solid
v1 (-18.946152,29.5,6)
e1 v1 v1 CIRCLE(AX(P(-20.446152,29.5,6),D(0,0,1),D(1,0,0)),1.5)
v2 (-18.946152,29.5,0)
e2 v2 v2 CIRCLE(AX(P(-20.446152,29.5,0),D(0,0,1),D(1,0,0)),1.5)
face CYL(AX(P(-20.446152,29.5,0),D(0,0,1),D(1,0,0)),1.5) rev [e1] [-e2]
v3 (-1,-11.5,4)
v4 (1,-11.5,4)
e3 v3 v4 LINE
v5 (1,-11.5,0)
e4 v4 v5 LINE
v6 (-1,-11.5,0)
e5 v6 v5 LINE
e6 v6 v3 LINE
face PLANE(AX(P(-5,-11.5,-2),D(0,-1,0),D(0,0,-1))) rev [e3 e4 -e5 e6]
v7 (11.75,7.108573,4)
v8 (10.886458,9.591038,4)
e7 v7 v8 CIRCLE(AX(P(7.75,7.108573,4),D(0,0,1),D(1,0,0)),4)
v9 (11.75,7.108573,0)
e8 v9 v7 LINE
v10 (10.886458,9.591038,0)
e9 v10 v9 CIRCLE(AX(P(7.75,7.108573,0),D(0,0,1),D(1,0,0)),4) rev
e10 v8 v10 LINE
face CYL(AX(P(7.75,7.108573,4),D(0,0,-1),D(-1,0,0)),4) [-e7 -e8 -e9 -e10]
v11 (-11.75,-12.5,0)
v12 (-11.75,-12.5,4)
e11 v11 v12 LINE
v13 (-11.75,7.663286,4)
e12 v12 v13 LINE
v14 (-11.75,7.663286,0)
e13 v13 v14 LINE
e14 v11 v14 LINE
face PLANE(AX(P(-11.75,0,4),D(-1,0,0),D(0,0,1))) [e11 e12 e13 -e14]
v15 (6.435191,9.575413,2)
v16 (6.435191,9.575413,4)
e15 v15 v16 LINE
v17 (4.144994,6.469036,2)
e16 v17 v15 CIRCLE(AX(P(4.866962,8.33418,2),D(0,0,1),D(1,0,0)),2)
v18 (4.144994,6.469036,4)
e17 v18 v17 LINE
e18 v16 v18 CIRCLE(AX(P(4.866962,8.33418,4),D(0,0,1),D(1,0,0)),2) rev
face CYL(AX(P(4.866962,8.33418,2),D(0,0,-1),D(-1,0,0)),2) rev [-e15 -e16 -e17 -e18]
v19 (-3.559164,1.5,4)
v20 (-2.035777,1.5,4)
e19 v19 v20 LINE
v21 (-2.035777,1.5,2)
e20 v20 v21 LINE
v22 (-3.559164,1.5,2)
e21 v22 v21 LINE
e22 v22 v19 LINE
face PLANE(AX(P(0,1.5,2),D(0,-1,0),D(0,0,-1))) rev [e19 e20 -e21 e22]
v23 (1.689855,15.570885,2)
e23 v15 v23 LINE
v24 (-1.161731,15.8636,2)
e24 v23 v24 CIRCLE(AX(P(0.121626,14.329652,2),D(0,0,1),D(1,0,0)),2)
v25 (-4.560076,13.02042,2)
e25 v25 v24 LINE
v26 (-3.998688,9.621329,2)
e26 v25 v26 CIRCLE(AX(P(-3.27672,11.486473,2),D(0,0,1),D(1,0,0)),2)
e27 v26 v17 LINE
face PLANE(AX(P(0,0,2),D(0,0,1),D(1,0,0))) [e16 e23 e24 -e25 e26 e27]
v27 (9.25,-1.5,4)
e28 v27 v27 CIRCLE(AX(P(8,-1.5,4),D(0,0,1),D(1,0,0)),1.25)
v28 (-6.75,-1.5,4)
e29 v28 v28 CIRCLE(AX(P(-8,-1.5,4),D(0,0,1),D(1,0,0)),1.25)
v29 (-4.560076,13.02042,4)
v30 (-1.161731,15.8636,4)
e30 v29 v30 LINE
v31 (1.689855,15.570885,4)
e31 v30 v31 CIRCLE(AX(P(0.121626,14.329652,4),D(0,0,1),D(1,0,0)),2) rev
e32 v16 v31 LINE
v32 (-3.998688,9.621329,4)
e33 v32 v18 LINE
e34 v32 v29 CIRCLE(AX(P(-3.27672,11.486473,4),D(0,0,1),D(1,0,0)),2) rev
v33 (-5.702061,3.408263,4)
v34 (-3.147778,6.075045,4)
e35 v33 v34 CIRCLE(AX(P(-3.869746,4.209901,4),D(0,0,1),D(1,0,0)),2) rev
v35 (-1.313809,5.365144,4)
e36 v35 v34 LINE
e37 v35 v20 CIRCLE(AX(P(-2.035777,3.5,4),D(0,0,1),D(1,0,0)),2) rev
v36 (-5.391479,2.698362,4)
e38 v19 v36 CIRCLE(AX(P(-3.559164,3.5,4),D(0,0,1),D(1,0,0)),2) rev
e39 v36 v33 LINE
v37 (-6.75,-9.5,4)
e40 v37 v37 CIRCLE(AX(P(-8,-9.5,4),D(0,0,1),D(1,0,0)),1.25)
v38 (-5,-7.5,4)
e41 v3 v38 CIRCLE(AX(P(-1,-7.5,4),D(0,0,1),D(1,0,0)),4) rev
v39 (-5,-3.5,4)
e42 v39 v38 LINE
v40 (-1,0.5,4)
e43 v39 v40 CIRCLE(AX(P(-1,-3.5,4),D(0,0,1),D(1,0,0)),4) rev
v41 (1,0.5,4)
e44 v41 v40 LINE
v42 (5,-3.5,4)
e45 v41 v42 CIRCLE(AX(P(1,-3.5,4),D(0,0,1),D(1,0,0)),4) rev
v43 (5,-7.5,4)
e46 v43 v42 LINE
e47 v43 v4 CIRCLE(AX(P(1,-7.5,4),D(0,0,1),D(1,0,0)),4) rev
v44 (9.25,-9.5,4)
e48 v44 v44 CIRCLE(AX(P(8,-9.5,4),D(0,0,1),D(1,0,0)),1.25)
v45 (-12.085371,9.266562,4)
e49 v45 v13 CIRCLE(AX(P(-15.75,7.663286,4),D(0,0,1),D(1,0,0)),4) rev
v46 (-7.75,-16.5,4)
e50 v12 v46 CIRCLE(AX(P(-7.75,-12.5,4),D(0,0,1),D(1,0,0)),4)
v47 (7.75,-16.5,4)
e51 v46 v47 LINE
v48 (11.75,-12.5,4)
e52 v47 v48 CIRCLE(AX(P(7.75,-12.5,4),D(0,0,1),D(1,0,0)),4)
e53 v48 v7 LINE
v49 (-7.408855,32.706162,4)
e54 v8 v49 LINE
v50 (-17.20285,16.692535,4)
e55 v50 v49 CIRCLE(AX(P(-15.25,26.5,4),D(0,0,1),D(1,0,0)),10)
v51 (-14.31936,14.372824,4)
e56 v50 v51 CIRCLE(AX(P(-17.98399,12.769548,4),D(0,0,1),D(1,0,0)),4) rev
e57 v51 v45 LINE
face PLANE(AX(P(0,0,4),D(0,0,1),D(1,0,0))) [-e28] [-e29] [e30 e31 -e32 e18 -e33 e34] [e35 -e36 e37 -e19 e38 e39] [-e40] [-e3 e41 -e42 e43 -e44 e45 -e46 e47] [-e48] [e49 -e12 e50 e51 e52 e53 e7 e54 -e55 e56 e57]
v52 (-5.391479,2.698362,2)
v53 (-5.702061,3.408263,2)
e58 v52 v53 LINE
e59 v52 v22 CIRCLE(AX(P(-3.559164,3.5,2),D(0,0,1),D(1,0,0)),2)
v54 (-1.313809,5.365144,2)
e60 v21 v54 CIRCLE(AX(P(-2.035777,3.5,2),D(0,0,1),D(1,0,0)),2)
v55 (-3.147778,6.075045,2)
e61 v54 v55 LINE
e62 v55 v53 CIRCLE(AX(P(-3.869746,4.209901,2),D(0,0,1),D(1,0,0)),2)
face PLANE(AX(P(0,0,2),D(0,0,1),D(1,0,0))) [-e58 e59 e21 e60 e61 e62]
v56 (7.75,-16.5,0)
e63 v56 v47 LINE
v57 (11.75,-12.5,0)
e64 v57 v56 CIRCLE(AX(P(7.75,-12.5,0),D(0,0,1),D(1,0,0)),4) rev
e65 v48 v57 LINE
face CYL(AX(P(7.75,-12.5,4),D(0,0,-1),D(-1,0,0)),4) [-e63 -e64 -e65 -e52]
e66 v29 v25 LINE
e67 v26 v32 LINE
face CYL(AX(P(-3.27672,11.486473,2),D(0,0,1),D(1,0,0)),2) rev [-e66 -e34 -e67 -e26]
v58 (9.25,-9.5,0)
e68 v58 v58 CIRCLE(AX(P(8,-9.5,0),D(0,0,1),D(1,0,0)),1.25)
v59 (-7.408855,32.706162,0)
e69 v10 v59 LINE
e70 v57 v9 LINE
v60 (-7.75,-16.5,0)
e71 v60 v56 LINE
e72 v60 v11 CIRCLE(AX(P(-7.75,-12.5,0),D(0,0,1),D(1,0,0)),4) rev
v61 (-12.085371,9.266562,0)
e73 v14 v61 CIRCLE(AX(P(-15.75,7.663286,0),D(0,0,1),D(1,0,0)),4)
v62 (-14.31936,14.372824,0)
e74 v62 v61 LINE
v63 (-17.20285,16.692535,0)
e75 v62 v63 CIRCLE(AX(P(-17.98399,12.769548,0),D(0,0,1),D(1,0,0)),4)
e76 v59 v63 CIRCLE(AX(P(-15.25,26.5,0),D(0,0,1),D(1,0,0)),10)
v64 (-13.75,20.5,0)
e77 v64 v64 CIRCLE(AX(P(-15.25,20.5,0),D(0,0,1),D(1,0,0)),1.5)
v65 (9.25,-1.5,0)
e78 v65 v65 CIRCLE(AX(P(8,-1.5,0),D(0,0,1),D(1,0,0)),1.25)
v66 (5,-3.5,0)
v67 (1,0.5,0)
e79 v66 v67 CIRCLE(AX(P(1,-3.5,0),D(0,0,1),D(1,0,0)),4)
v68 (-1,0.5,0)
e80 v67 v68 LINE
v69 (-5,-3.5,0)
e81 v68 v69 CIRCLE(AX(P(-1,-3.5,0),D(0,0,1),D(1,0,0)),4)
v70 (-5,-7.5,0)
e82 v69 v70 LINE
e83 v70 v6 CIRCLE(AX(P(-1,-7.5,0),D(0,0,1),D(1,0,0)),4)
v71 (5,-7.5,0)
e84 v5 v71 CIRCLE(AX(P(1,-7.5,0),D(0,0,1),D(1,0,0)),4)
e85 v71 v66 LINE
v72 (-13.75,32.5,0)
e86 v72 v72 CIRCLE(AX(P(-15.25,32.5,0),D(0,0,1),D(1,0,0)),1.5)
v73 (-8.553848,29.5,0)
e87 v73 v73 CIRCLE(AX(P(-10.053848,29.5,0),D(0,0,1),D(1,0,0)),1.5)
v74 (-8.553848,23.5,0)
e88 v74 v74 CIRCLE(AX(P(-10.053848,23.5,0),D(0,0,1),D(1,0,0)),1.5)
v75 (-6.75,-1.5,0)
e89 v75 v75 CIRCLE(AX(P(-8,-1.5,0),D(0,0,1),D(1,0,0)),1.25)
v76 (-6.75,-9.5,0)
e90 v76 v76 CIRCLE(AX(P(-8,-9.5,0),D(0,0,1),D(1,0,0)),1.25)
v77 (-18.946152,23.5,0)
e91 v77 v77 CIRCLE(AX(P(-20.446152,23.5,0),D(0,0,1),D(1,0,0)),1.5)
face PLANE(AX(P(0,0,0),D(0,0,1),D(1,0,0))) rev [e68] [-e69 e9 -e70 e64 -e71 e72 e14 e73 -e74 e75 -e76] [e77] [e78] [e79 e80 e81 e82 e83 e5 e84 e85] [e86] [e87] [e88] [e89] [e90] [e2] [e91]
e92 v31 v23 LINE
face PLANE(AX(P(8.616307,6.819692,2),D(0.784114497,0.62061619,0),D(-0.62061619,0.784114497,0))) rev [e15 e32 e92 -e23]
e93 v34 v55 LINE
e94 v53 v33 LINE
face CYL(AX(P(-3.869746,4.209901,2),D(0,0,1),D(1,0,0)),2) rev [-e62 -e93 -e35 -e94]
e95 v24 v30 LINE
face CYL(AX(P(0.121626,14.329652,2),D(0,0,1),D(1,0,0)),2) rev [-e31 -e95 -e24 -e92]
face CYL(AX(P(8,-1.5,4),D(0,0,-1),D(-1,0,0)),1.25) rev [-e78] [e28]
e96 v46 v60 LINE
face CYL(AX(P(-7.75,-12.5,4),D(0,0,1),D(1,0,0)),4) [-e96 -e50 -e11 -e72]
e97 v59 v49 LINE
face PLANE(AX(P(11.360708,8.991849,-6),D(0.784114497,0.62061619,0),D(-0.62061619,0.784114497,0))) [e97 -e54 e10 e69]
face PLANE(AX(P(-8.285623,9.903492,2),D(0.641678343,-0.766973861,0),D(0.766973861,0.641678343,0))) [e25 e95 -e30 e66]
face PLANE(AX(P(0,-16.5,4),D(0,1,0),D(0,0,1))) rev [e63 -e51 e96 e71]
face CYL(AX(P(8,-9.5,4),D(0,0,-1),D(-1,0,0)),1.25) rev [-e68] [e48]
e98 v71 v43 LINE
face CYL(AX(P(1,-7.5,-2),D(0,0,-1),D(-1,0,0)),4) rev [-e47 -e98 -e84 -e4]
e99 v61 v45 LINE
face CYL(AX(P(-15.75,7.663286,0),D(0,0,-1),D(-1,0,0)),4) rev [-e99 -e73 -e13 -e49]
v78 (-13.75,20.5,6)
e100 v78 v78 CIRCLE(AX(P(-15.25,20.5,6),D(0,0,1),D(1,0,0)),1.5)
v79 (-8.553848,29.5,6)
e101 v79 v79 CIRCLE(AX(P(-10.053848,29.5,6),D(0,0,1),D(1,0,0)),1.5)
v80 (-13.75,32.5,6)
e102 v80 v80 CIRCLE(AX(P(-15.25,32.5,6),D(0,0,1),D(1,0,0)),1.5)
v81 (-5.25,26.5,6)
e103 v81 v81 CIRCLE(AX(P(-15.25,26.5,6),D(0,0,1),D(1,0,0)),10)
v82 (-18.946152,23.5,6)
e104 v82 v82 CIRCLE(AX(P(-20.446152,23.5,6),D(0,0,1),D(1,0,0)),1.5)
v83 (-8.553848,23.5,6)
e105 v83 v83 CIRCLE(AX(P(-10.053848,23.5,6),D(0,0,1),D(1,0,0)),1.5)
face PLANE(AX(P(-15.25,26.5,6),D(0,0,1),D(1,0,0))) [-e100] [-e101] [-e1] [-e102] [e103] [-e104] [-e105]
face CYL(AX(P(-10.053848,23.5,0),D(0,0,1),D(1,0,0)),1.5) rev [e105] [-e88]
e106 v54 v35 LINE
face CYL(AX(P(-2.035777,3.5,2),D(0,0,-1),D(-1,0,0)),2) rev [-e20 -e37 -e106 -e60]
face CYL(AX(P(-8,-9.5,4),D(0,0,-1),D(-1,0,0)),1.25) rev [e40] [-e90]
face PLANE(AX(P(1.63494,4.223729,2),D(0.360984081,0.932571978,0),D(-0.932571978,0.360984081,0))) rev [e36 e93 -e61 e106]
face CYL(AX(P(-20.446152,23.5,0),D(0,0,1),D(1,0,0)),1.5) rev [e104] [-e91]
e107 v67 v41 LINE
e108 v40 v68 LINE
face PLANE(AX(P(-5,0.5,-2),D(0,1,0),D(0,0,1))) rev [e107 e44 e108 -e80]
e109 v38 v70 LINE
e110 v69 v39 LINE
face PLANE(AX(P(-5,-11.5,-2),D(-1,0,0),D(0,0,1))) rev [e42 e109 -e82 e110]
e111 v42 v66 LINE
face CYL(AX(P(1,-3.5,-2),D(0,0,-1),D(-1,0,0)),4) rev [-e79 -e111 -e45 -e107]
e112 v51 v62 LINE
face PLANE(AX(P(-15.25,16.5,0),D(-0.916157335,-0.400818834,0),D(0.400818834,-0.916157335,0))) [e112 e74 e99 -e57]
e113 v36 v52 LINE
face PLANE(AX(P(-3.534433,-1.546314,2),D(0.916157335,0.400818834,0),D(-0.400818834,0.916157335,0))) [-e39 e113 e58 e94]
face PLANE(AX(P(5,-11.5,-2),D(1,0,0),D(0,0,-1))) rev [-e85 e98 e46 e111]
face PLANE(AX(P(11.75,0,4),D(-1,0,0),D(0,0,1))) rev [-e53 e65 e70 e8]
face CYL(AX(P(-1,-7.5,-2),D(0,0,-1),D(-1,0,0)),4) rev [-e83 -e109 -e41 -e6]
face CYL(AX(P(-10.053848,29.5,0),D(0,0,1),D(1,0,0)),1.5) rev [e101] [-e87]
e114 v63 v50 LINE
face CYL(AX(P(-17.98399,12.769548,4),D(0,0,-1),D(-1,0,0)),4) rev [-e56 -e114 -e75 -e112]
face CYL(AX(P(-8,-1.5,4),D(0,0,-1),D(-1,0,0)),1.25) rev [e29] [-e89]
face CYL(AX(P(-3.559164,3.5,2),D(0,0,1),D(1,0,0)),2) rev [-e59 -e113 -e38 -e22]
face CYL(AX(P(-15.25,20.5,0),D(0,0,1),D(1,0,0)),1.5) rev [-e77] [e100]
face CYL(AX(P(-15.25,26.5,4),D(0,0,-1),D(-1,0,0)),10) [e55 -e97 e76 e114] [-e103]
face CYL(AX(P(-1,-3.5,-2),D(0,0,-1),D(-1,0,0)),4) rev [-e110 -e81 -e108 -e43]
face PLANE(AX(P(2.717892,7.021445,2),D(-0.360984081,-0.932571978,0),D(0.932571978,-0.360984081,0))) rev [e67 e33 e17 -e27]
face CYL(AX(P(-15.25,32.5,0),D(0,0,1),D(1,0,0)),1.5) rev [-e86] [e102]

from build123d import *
from build123d.topology import SkipClean

# Parameters (mm, degrees)
SKETCH_1_R          = 10
SKETCH_1_W          = 23.5
SKETCH_1_H          = 33
SKETCH_1_R_2        = 1.25
EXTRUDE_1_DEPTH     = 4
SKETCH_2_R          = 10
EXTRUDE_2_DEPTH     = 2
SKETCH_3_R          = 1.5
CUT_EXTRUDE_1_DEPTH = 6
SKETCH_4_W          = 10
SKETCH_4_H          = 12
CUT_EXTRUDE_2_DEPTH = 6
CUT_EXTRUDE_START   = -10
CUT_EXTRUDE_4_DEPTH = 10
EXTRUDE_4_DEPTH     = 4
FILLET_1_R          = 4
CUT_EXTRUDE_5_DEPTH = 2
FILLET_2_R          = 2
FILLET_3_R          = 4


with BuildPart() as part:
    # 草图1 → 凸台-拉伸1 (new body)
    # profile 1 of 3: a face of its own
    with BuildSketch(Plane.XY):
        with Locations((-15.25, 26.5)):
            Circle(SKETCH_1_R)
    # profile 2 of 3: a face of its own
    with BuildSketch(Plane.XY):
        with BuildLine():
            Line((-15.25, 16.5), (-11.75, 16.5))
            Line((-11.75, 16.5), (11.75, 16.5))
            Line((11.75, 16.5), (-8.736127865, 34.087454765))
            ThreePointArc((-8.736127865, 34.087454765), (-6.16323156, 30.675001716), (-5.25, 26.5))
            ThreePointArc((-5.25, 26.5), (-8.178932188, 19.428932188), (-15.25, 16.5))
        make_face()
    # profile 3 of 3: a face of its own
    with BuildSketch(Plane.XY):
        Rectangle(SKETCH_1_W, SKETCH_1_H)
        with Locations((-8, -1.5)):
            Circle(SKETCH_1_R_2, mode=Mode.SUBTRACT)
        with Locations((-8, -9.5)):
            Circle(SKETCH_1_R_2, mode=Mode.SUBTRACT)
        with Locations((8, -9.5)):
            Circle(SKETCH_1_R_2, mode=Mode.SUBTRACT)
        with Locations((8, -1.5)):
            Circle(SKETCH_1_R_2, mode=Mode.SUBTRACT)
    extrude(amount=EXTRUDE_1_DEPTH)

    # 草图2 → 凸台-拉伸2 (add)
    with BuildSketch(Plane.XY.offset(4)):
        with Locations(Location((-15.25, 26.5, 0), (0, 0, 270))):
            Circle(SKETCH_2_R)
    extrude(amount=EXTRUDE_2_DEPTH)

    # 草图3 → 切除-拉伸1 (cut)
    with BuildSketch(Plane.XY.offset(6)):
        with Locations((-15.25, 32.5)):
            Circle(SKETCH_3_R)
        with Locations((-10.053847577, 29.5)):
            Circle(SKETCH_3_R)
        with Locations((-10.053847577, 23.5)):
            Circle(SKETCH_3_R)
        with Locations((-15.25, 20.5)):
            Circle(SKETCH_3_R)
        with Locations((-20.446152423, 23.5)):
            Circle(SKETCH_3_R)
        with Locations((-20.446152423, 29.5)):
            Circle(SKETCH_3_R)
    extrude(amount=-CUT_EXTRUDE_1_DEPTH, mode=Mode.SUBTRACT)

    # 草图4 → 切除-拉伸2 (cut)
    with BuildSketch(Plane.XY.offset(4)):
        with Locations((0, -5.5)):
            Rectangle(SKETCH_4_W, SKETCH_4_H)
    extrude(amount=-CUT_EXTRUDE_2_DEPTH, mode=Mode.SUBTRACT)

    # 草图7 → 切除-拉伸4 (cut)
    with SkipClean():  # the faces are left unmerged after this step: merging them gives an invalid solid
        with BuildSketch(Plane.XY.offset(4).offset(CUT_EXTRUDE_START)):
            with BuildLine():
                Line((-7.408855029, 32.706161901), (11.75, 8.5))
                Line((11.75, 8.5), (11.75, 16.5))
                Line((11.75, 16.5), (-8.736127865, 34.087454765))
                ThreePointArc((-8.736127865, 34.087454765), (-8.03933973, 33.428663542), (-7.408855029, 32.706161901))
            make_face()
        extrude(amount=CUT_EXTRUDE_4_DEPTH, mode=Mode.SUBTRACT)

    # 草图8 → 凸台-拉伸4 (add)
    with SkipClean():  # the faces are left unmerged after this step: merging them gives an invalid solid
        with BuildSketch(Plane.XY.offset(4)):
            Polygon((-15.25, 16.5), (-11.75, 8.5), (-11.75, 16.5), align=None)
        extrude(amount=-EXTRUDE_4_DEPTH)

    # 圆角1
    # the kernel refuses this fillet: 4 mm, written as the material it adds along each edge
    with BuildSketch(Plane(origin=(-11.75, 8.5, 4), x_dir=(-0.4008188340197085, 0.9161573349021888, 0), z_dir=(0, 0, -1))) as fillet_1_piece_1:
        with BuildLine():
            CenterArc((FILLET_1_R * 0.209178456653, -FILLET_1_R), FILLET_1_R, 90, 23.629377731)
            Line((-FILLET_1_R * 0.191640377366, -FILLET_1_R * 0.0838426650978), (0, 0))
            Line((0, 0), (FILLET_1_R * 0.209178456653, 0))
        make_face()
    extrude(amount=4)
    with BuildSketch(Plane(origin=(-15.25, 16.5, 0), x_dir=(-0.9951749946983144, 0.09811590048106404, 0), z_dir=(0, 0, 1))) as fillet_1_piece_2:
        with BuildLine():
            CenterArc((2.354781612, 3.980699979), FILLET_1_R, 209.260063678, 55.109250376)
            Line((-1.134859069, 2.025602047), (0, 0))
            ThreePointArc((0, 0), (0.981159005, 0.048250053), (1.96231801, 0))
        make_face()
    extrude(amount=4)
    # the kernel refuses this fillet: 4 mm, written as the material it takes off along each edge
    with BuildSketch(Plane(origin=(11.75, -16.5, -10), x_dir=(0, 1, 0), z_dir=(0, 0, 1)), Plane(origin=(-11.75, -16.5, -10), x_dir=(1, 0, 0), z_dir=(0, 0, 1))) as fillet_1_2_piece_1:
        with BuildLine():
            CenterArc((FILLET_1_R, FILLET_1_R), FILLET_1_R, 180, 90)
            Line((0, FILLET_1_R), (0, 0))
            Line((0, 0), (FILLET_1_R, 0))
        make_face()
    extrude(amount=24, mode=Mode.SUBTRACT)
    with BuildSketch(Plane(origin=(11.75, 8.5, -3.478567049), x_dir=(-0.6206161901076825, 0.7841144971088245, 0), z_dir=(0, 0, 1))) as fillet_1_2_piece_2:
        with BuildLine():
            CenterArc((FILLET_1_R * 0.347856704888, FILLET_1_R), FILLET_1_R, 231.638854085, 38.361145915)
            Line((-FILLET_1_R * 0.272759485219, FILLET_1_R * 0.215885502891), (0, 0))
            Line((0, 0), (FILLET_1_R * 0.347856704888, 0))
        make_face()
    extrude(amount=10.957134098, mode=Mode.SUBTRACT)

    # 草图9 → 切除-拉伸5 (cut)
    with BuildSketch(Plane.XY.offset(4)):
        Polygon((-7.627398855, 7.809036267), (-4.867195488, 1.5), (8.671465121, 1.5), align=None)
        Polygon((-7.160168155, 10.845088414), (10.991392982, 3.818901946), (0.414449212, 17.182289942), align=None)
    extrude(amount=-CUT_EXTRUDE_5_DEPTH, mode=Mode.SUBTRACT)

    # 圆角2
    fillet_2_edges = [part.edges().sort_by_distance(p)[0] for p in [
        (-7.160168155, 10.845088414, 3),
        (0.414449212, 17.182289942, 3),
        (10.991392982, 3.818901946, 3),
        (8.671465121, 1.5, 3),
        (-4.867195488, 1.5, 3),
        (-7.627398855, 7.809036267, 3),
    ]]
    fillet(fillet_2_edges, radius=FILLET_2_R)

    # 圆角3
    fillet_3_edges = [part.edges().sort_by_distance(p)[0] for p in [
        (5, 0.5, 2),
        (5, -11.5, 2),
        (-5, -11.5, 2),
        (-5, 0.5, 2),
    ]]
    fillet(fillet_3_edges, radius=FILLET_3_R)


solid = part.part
